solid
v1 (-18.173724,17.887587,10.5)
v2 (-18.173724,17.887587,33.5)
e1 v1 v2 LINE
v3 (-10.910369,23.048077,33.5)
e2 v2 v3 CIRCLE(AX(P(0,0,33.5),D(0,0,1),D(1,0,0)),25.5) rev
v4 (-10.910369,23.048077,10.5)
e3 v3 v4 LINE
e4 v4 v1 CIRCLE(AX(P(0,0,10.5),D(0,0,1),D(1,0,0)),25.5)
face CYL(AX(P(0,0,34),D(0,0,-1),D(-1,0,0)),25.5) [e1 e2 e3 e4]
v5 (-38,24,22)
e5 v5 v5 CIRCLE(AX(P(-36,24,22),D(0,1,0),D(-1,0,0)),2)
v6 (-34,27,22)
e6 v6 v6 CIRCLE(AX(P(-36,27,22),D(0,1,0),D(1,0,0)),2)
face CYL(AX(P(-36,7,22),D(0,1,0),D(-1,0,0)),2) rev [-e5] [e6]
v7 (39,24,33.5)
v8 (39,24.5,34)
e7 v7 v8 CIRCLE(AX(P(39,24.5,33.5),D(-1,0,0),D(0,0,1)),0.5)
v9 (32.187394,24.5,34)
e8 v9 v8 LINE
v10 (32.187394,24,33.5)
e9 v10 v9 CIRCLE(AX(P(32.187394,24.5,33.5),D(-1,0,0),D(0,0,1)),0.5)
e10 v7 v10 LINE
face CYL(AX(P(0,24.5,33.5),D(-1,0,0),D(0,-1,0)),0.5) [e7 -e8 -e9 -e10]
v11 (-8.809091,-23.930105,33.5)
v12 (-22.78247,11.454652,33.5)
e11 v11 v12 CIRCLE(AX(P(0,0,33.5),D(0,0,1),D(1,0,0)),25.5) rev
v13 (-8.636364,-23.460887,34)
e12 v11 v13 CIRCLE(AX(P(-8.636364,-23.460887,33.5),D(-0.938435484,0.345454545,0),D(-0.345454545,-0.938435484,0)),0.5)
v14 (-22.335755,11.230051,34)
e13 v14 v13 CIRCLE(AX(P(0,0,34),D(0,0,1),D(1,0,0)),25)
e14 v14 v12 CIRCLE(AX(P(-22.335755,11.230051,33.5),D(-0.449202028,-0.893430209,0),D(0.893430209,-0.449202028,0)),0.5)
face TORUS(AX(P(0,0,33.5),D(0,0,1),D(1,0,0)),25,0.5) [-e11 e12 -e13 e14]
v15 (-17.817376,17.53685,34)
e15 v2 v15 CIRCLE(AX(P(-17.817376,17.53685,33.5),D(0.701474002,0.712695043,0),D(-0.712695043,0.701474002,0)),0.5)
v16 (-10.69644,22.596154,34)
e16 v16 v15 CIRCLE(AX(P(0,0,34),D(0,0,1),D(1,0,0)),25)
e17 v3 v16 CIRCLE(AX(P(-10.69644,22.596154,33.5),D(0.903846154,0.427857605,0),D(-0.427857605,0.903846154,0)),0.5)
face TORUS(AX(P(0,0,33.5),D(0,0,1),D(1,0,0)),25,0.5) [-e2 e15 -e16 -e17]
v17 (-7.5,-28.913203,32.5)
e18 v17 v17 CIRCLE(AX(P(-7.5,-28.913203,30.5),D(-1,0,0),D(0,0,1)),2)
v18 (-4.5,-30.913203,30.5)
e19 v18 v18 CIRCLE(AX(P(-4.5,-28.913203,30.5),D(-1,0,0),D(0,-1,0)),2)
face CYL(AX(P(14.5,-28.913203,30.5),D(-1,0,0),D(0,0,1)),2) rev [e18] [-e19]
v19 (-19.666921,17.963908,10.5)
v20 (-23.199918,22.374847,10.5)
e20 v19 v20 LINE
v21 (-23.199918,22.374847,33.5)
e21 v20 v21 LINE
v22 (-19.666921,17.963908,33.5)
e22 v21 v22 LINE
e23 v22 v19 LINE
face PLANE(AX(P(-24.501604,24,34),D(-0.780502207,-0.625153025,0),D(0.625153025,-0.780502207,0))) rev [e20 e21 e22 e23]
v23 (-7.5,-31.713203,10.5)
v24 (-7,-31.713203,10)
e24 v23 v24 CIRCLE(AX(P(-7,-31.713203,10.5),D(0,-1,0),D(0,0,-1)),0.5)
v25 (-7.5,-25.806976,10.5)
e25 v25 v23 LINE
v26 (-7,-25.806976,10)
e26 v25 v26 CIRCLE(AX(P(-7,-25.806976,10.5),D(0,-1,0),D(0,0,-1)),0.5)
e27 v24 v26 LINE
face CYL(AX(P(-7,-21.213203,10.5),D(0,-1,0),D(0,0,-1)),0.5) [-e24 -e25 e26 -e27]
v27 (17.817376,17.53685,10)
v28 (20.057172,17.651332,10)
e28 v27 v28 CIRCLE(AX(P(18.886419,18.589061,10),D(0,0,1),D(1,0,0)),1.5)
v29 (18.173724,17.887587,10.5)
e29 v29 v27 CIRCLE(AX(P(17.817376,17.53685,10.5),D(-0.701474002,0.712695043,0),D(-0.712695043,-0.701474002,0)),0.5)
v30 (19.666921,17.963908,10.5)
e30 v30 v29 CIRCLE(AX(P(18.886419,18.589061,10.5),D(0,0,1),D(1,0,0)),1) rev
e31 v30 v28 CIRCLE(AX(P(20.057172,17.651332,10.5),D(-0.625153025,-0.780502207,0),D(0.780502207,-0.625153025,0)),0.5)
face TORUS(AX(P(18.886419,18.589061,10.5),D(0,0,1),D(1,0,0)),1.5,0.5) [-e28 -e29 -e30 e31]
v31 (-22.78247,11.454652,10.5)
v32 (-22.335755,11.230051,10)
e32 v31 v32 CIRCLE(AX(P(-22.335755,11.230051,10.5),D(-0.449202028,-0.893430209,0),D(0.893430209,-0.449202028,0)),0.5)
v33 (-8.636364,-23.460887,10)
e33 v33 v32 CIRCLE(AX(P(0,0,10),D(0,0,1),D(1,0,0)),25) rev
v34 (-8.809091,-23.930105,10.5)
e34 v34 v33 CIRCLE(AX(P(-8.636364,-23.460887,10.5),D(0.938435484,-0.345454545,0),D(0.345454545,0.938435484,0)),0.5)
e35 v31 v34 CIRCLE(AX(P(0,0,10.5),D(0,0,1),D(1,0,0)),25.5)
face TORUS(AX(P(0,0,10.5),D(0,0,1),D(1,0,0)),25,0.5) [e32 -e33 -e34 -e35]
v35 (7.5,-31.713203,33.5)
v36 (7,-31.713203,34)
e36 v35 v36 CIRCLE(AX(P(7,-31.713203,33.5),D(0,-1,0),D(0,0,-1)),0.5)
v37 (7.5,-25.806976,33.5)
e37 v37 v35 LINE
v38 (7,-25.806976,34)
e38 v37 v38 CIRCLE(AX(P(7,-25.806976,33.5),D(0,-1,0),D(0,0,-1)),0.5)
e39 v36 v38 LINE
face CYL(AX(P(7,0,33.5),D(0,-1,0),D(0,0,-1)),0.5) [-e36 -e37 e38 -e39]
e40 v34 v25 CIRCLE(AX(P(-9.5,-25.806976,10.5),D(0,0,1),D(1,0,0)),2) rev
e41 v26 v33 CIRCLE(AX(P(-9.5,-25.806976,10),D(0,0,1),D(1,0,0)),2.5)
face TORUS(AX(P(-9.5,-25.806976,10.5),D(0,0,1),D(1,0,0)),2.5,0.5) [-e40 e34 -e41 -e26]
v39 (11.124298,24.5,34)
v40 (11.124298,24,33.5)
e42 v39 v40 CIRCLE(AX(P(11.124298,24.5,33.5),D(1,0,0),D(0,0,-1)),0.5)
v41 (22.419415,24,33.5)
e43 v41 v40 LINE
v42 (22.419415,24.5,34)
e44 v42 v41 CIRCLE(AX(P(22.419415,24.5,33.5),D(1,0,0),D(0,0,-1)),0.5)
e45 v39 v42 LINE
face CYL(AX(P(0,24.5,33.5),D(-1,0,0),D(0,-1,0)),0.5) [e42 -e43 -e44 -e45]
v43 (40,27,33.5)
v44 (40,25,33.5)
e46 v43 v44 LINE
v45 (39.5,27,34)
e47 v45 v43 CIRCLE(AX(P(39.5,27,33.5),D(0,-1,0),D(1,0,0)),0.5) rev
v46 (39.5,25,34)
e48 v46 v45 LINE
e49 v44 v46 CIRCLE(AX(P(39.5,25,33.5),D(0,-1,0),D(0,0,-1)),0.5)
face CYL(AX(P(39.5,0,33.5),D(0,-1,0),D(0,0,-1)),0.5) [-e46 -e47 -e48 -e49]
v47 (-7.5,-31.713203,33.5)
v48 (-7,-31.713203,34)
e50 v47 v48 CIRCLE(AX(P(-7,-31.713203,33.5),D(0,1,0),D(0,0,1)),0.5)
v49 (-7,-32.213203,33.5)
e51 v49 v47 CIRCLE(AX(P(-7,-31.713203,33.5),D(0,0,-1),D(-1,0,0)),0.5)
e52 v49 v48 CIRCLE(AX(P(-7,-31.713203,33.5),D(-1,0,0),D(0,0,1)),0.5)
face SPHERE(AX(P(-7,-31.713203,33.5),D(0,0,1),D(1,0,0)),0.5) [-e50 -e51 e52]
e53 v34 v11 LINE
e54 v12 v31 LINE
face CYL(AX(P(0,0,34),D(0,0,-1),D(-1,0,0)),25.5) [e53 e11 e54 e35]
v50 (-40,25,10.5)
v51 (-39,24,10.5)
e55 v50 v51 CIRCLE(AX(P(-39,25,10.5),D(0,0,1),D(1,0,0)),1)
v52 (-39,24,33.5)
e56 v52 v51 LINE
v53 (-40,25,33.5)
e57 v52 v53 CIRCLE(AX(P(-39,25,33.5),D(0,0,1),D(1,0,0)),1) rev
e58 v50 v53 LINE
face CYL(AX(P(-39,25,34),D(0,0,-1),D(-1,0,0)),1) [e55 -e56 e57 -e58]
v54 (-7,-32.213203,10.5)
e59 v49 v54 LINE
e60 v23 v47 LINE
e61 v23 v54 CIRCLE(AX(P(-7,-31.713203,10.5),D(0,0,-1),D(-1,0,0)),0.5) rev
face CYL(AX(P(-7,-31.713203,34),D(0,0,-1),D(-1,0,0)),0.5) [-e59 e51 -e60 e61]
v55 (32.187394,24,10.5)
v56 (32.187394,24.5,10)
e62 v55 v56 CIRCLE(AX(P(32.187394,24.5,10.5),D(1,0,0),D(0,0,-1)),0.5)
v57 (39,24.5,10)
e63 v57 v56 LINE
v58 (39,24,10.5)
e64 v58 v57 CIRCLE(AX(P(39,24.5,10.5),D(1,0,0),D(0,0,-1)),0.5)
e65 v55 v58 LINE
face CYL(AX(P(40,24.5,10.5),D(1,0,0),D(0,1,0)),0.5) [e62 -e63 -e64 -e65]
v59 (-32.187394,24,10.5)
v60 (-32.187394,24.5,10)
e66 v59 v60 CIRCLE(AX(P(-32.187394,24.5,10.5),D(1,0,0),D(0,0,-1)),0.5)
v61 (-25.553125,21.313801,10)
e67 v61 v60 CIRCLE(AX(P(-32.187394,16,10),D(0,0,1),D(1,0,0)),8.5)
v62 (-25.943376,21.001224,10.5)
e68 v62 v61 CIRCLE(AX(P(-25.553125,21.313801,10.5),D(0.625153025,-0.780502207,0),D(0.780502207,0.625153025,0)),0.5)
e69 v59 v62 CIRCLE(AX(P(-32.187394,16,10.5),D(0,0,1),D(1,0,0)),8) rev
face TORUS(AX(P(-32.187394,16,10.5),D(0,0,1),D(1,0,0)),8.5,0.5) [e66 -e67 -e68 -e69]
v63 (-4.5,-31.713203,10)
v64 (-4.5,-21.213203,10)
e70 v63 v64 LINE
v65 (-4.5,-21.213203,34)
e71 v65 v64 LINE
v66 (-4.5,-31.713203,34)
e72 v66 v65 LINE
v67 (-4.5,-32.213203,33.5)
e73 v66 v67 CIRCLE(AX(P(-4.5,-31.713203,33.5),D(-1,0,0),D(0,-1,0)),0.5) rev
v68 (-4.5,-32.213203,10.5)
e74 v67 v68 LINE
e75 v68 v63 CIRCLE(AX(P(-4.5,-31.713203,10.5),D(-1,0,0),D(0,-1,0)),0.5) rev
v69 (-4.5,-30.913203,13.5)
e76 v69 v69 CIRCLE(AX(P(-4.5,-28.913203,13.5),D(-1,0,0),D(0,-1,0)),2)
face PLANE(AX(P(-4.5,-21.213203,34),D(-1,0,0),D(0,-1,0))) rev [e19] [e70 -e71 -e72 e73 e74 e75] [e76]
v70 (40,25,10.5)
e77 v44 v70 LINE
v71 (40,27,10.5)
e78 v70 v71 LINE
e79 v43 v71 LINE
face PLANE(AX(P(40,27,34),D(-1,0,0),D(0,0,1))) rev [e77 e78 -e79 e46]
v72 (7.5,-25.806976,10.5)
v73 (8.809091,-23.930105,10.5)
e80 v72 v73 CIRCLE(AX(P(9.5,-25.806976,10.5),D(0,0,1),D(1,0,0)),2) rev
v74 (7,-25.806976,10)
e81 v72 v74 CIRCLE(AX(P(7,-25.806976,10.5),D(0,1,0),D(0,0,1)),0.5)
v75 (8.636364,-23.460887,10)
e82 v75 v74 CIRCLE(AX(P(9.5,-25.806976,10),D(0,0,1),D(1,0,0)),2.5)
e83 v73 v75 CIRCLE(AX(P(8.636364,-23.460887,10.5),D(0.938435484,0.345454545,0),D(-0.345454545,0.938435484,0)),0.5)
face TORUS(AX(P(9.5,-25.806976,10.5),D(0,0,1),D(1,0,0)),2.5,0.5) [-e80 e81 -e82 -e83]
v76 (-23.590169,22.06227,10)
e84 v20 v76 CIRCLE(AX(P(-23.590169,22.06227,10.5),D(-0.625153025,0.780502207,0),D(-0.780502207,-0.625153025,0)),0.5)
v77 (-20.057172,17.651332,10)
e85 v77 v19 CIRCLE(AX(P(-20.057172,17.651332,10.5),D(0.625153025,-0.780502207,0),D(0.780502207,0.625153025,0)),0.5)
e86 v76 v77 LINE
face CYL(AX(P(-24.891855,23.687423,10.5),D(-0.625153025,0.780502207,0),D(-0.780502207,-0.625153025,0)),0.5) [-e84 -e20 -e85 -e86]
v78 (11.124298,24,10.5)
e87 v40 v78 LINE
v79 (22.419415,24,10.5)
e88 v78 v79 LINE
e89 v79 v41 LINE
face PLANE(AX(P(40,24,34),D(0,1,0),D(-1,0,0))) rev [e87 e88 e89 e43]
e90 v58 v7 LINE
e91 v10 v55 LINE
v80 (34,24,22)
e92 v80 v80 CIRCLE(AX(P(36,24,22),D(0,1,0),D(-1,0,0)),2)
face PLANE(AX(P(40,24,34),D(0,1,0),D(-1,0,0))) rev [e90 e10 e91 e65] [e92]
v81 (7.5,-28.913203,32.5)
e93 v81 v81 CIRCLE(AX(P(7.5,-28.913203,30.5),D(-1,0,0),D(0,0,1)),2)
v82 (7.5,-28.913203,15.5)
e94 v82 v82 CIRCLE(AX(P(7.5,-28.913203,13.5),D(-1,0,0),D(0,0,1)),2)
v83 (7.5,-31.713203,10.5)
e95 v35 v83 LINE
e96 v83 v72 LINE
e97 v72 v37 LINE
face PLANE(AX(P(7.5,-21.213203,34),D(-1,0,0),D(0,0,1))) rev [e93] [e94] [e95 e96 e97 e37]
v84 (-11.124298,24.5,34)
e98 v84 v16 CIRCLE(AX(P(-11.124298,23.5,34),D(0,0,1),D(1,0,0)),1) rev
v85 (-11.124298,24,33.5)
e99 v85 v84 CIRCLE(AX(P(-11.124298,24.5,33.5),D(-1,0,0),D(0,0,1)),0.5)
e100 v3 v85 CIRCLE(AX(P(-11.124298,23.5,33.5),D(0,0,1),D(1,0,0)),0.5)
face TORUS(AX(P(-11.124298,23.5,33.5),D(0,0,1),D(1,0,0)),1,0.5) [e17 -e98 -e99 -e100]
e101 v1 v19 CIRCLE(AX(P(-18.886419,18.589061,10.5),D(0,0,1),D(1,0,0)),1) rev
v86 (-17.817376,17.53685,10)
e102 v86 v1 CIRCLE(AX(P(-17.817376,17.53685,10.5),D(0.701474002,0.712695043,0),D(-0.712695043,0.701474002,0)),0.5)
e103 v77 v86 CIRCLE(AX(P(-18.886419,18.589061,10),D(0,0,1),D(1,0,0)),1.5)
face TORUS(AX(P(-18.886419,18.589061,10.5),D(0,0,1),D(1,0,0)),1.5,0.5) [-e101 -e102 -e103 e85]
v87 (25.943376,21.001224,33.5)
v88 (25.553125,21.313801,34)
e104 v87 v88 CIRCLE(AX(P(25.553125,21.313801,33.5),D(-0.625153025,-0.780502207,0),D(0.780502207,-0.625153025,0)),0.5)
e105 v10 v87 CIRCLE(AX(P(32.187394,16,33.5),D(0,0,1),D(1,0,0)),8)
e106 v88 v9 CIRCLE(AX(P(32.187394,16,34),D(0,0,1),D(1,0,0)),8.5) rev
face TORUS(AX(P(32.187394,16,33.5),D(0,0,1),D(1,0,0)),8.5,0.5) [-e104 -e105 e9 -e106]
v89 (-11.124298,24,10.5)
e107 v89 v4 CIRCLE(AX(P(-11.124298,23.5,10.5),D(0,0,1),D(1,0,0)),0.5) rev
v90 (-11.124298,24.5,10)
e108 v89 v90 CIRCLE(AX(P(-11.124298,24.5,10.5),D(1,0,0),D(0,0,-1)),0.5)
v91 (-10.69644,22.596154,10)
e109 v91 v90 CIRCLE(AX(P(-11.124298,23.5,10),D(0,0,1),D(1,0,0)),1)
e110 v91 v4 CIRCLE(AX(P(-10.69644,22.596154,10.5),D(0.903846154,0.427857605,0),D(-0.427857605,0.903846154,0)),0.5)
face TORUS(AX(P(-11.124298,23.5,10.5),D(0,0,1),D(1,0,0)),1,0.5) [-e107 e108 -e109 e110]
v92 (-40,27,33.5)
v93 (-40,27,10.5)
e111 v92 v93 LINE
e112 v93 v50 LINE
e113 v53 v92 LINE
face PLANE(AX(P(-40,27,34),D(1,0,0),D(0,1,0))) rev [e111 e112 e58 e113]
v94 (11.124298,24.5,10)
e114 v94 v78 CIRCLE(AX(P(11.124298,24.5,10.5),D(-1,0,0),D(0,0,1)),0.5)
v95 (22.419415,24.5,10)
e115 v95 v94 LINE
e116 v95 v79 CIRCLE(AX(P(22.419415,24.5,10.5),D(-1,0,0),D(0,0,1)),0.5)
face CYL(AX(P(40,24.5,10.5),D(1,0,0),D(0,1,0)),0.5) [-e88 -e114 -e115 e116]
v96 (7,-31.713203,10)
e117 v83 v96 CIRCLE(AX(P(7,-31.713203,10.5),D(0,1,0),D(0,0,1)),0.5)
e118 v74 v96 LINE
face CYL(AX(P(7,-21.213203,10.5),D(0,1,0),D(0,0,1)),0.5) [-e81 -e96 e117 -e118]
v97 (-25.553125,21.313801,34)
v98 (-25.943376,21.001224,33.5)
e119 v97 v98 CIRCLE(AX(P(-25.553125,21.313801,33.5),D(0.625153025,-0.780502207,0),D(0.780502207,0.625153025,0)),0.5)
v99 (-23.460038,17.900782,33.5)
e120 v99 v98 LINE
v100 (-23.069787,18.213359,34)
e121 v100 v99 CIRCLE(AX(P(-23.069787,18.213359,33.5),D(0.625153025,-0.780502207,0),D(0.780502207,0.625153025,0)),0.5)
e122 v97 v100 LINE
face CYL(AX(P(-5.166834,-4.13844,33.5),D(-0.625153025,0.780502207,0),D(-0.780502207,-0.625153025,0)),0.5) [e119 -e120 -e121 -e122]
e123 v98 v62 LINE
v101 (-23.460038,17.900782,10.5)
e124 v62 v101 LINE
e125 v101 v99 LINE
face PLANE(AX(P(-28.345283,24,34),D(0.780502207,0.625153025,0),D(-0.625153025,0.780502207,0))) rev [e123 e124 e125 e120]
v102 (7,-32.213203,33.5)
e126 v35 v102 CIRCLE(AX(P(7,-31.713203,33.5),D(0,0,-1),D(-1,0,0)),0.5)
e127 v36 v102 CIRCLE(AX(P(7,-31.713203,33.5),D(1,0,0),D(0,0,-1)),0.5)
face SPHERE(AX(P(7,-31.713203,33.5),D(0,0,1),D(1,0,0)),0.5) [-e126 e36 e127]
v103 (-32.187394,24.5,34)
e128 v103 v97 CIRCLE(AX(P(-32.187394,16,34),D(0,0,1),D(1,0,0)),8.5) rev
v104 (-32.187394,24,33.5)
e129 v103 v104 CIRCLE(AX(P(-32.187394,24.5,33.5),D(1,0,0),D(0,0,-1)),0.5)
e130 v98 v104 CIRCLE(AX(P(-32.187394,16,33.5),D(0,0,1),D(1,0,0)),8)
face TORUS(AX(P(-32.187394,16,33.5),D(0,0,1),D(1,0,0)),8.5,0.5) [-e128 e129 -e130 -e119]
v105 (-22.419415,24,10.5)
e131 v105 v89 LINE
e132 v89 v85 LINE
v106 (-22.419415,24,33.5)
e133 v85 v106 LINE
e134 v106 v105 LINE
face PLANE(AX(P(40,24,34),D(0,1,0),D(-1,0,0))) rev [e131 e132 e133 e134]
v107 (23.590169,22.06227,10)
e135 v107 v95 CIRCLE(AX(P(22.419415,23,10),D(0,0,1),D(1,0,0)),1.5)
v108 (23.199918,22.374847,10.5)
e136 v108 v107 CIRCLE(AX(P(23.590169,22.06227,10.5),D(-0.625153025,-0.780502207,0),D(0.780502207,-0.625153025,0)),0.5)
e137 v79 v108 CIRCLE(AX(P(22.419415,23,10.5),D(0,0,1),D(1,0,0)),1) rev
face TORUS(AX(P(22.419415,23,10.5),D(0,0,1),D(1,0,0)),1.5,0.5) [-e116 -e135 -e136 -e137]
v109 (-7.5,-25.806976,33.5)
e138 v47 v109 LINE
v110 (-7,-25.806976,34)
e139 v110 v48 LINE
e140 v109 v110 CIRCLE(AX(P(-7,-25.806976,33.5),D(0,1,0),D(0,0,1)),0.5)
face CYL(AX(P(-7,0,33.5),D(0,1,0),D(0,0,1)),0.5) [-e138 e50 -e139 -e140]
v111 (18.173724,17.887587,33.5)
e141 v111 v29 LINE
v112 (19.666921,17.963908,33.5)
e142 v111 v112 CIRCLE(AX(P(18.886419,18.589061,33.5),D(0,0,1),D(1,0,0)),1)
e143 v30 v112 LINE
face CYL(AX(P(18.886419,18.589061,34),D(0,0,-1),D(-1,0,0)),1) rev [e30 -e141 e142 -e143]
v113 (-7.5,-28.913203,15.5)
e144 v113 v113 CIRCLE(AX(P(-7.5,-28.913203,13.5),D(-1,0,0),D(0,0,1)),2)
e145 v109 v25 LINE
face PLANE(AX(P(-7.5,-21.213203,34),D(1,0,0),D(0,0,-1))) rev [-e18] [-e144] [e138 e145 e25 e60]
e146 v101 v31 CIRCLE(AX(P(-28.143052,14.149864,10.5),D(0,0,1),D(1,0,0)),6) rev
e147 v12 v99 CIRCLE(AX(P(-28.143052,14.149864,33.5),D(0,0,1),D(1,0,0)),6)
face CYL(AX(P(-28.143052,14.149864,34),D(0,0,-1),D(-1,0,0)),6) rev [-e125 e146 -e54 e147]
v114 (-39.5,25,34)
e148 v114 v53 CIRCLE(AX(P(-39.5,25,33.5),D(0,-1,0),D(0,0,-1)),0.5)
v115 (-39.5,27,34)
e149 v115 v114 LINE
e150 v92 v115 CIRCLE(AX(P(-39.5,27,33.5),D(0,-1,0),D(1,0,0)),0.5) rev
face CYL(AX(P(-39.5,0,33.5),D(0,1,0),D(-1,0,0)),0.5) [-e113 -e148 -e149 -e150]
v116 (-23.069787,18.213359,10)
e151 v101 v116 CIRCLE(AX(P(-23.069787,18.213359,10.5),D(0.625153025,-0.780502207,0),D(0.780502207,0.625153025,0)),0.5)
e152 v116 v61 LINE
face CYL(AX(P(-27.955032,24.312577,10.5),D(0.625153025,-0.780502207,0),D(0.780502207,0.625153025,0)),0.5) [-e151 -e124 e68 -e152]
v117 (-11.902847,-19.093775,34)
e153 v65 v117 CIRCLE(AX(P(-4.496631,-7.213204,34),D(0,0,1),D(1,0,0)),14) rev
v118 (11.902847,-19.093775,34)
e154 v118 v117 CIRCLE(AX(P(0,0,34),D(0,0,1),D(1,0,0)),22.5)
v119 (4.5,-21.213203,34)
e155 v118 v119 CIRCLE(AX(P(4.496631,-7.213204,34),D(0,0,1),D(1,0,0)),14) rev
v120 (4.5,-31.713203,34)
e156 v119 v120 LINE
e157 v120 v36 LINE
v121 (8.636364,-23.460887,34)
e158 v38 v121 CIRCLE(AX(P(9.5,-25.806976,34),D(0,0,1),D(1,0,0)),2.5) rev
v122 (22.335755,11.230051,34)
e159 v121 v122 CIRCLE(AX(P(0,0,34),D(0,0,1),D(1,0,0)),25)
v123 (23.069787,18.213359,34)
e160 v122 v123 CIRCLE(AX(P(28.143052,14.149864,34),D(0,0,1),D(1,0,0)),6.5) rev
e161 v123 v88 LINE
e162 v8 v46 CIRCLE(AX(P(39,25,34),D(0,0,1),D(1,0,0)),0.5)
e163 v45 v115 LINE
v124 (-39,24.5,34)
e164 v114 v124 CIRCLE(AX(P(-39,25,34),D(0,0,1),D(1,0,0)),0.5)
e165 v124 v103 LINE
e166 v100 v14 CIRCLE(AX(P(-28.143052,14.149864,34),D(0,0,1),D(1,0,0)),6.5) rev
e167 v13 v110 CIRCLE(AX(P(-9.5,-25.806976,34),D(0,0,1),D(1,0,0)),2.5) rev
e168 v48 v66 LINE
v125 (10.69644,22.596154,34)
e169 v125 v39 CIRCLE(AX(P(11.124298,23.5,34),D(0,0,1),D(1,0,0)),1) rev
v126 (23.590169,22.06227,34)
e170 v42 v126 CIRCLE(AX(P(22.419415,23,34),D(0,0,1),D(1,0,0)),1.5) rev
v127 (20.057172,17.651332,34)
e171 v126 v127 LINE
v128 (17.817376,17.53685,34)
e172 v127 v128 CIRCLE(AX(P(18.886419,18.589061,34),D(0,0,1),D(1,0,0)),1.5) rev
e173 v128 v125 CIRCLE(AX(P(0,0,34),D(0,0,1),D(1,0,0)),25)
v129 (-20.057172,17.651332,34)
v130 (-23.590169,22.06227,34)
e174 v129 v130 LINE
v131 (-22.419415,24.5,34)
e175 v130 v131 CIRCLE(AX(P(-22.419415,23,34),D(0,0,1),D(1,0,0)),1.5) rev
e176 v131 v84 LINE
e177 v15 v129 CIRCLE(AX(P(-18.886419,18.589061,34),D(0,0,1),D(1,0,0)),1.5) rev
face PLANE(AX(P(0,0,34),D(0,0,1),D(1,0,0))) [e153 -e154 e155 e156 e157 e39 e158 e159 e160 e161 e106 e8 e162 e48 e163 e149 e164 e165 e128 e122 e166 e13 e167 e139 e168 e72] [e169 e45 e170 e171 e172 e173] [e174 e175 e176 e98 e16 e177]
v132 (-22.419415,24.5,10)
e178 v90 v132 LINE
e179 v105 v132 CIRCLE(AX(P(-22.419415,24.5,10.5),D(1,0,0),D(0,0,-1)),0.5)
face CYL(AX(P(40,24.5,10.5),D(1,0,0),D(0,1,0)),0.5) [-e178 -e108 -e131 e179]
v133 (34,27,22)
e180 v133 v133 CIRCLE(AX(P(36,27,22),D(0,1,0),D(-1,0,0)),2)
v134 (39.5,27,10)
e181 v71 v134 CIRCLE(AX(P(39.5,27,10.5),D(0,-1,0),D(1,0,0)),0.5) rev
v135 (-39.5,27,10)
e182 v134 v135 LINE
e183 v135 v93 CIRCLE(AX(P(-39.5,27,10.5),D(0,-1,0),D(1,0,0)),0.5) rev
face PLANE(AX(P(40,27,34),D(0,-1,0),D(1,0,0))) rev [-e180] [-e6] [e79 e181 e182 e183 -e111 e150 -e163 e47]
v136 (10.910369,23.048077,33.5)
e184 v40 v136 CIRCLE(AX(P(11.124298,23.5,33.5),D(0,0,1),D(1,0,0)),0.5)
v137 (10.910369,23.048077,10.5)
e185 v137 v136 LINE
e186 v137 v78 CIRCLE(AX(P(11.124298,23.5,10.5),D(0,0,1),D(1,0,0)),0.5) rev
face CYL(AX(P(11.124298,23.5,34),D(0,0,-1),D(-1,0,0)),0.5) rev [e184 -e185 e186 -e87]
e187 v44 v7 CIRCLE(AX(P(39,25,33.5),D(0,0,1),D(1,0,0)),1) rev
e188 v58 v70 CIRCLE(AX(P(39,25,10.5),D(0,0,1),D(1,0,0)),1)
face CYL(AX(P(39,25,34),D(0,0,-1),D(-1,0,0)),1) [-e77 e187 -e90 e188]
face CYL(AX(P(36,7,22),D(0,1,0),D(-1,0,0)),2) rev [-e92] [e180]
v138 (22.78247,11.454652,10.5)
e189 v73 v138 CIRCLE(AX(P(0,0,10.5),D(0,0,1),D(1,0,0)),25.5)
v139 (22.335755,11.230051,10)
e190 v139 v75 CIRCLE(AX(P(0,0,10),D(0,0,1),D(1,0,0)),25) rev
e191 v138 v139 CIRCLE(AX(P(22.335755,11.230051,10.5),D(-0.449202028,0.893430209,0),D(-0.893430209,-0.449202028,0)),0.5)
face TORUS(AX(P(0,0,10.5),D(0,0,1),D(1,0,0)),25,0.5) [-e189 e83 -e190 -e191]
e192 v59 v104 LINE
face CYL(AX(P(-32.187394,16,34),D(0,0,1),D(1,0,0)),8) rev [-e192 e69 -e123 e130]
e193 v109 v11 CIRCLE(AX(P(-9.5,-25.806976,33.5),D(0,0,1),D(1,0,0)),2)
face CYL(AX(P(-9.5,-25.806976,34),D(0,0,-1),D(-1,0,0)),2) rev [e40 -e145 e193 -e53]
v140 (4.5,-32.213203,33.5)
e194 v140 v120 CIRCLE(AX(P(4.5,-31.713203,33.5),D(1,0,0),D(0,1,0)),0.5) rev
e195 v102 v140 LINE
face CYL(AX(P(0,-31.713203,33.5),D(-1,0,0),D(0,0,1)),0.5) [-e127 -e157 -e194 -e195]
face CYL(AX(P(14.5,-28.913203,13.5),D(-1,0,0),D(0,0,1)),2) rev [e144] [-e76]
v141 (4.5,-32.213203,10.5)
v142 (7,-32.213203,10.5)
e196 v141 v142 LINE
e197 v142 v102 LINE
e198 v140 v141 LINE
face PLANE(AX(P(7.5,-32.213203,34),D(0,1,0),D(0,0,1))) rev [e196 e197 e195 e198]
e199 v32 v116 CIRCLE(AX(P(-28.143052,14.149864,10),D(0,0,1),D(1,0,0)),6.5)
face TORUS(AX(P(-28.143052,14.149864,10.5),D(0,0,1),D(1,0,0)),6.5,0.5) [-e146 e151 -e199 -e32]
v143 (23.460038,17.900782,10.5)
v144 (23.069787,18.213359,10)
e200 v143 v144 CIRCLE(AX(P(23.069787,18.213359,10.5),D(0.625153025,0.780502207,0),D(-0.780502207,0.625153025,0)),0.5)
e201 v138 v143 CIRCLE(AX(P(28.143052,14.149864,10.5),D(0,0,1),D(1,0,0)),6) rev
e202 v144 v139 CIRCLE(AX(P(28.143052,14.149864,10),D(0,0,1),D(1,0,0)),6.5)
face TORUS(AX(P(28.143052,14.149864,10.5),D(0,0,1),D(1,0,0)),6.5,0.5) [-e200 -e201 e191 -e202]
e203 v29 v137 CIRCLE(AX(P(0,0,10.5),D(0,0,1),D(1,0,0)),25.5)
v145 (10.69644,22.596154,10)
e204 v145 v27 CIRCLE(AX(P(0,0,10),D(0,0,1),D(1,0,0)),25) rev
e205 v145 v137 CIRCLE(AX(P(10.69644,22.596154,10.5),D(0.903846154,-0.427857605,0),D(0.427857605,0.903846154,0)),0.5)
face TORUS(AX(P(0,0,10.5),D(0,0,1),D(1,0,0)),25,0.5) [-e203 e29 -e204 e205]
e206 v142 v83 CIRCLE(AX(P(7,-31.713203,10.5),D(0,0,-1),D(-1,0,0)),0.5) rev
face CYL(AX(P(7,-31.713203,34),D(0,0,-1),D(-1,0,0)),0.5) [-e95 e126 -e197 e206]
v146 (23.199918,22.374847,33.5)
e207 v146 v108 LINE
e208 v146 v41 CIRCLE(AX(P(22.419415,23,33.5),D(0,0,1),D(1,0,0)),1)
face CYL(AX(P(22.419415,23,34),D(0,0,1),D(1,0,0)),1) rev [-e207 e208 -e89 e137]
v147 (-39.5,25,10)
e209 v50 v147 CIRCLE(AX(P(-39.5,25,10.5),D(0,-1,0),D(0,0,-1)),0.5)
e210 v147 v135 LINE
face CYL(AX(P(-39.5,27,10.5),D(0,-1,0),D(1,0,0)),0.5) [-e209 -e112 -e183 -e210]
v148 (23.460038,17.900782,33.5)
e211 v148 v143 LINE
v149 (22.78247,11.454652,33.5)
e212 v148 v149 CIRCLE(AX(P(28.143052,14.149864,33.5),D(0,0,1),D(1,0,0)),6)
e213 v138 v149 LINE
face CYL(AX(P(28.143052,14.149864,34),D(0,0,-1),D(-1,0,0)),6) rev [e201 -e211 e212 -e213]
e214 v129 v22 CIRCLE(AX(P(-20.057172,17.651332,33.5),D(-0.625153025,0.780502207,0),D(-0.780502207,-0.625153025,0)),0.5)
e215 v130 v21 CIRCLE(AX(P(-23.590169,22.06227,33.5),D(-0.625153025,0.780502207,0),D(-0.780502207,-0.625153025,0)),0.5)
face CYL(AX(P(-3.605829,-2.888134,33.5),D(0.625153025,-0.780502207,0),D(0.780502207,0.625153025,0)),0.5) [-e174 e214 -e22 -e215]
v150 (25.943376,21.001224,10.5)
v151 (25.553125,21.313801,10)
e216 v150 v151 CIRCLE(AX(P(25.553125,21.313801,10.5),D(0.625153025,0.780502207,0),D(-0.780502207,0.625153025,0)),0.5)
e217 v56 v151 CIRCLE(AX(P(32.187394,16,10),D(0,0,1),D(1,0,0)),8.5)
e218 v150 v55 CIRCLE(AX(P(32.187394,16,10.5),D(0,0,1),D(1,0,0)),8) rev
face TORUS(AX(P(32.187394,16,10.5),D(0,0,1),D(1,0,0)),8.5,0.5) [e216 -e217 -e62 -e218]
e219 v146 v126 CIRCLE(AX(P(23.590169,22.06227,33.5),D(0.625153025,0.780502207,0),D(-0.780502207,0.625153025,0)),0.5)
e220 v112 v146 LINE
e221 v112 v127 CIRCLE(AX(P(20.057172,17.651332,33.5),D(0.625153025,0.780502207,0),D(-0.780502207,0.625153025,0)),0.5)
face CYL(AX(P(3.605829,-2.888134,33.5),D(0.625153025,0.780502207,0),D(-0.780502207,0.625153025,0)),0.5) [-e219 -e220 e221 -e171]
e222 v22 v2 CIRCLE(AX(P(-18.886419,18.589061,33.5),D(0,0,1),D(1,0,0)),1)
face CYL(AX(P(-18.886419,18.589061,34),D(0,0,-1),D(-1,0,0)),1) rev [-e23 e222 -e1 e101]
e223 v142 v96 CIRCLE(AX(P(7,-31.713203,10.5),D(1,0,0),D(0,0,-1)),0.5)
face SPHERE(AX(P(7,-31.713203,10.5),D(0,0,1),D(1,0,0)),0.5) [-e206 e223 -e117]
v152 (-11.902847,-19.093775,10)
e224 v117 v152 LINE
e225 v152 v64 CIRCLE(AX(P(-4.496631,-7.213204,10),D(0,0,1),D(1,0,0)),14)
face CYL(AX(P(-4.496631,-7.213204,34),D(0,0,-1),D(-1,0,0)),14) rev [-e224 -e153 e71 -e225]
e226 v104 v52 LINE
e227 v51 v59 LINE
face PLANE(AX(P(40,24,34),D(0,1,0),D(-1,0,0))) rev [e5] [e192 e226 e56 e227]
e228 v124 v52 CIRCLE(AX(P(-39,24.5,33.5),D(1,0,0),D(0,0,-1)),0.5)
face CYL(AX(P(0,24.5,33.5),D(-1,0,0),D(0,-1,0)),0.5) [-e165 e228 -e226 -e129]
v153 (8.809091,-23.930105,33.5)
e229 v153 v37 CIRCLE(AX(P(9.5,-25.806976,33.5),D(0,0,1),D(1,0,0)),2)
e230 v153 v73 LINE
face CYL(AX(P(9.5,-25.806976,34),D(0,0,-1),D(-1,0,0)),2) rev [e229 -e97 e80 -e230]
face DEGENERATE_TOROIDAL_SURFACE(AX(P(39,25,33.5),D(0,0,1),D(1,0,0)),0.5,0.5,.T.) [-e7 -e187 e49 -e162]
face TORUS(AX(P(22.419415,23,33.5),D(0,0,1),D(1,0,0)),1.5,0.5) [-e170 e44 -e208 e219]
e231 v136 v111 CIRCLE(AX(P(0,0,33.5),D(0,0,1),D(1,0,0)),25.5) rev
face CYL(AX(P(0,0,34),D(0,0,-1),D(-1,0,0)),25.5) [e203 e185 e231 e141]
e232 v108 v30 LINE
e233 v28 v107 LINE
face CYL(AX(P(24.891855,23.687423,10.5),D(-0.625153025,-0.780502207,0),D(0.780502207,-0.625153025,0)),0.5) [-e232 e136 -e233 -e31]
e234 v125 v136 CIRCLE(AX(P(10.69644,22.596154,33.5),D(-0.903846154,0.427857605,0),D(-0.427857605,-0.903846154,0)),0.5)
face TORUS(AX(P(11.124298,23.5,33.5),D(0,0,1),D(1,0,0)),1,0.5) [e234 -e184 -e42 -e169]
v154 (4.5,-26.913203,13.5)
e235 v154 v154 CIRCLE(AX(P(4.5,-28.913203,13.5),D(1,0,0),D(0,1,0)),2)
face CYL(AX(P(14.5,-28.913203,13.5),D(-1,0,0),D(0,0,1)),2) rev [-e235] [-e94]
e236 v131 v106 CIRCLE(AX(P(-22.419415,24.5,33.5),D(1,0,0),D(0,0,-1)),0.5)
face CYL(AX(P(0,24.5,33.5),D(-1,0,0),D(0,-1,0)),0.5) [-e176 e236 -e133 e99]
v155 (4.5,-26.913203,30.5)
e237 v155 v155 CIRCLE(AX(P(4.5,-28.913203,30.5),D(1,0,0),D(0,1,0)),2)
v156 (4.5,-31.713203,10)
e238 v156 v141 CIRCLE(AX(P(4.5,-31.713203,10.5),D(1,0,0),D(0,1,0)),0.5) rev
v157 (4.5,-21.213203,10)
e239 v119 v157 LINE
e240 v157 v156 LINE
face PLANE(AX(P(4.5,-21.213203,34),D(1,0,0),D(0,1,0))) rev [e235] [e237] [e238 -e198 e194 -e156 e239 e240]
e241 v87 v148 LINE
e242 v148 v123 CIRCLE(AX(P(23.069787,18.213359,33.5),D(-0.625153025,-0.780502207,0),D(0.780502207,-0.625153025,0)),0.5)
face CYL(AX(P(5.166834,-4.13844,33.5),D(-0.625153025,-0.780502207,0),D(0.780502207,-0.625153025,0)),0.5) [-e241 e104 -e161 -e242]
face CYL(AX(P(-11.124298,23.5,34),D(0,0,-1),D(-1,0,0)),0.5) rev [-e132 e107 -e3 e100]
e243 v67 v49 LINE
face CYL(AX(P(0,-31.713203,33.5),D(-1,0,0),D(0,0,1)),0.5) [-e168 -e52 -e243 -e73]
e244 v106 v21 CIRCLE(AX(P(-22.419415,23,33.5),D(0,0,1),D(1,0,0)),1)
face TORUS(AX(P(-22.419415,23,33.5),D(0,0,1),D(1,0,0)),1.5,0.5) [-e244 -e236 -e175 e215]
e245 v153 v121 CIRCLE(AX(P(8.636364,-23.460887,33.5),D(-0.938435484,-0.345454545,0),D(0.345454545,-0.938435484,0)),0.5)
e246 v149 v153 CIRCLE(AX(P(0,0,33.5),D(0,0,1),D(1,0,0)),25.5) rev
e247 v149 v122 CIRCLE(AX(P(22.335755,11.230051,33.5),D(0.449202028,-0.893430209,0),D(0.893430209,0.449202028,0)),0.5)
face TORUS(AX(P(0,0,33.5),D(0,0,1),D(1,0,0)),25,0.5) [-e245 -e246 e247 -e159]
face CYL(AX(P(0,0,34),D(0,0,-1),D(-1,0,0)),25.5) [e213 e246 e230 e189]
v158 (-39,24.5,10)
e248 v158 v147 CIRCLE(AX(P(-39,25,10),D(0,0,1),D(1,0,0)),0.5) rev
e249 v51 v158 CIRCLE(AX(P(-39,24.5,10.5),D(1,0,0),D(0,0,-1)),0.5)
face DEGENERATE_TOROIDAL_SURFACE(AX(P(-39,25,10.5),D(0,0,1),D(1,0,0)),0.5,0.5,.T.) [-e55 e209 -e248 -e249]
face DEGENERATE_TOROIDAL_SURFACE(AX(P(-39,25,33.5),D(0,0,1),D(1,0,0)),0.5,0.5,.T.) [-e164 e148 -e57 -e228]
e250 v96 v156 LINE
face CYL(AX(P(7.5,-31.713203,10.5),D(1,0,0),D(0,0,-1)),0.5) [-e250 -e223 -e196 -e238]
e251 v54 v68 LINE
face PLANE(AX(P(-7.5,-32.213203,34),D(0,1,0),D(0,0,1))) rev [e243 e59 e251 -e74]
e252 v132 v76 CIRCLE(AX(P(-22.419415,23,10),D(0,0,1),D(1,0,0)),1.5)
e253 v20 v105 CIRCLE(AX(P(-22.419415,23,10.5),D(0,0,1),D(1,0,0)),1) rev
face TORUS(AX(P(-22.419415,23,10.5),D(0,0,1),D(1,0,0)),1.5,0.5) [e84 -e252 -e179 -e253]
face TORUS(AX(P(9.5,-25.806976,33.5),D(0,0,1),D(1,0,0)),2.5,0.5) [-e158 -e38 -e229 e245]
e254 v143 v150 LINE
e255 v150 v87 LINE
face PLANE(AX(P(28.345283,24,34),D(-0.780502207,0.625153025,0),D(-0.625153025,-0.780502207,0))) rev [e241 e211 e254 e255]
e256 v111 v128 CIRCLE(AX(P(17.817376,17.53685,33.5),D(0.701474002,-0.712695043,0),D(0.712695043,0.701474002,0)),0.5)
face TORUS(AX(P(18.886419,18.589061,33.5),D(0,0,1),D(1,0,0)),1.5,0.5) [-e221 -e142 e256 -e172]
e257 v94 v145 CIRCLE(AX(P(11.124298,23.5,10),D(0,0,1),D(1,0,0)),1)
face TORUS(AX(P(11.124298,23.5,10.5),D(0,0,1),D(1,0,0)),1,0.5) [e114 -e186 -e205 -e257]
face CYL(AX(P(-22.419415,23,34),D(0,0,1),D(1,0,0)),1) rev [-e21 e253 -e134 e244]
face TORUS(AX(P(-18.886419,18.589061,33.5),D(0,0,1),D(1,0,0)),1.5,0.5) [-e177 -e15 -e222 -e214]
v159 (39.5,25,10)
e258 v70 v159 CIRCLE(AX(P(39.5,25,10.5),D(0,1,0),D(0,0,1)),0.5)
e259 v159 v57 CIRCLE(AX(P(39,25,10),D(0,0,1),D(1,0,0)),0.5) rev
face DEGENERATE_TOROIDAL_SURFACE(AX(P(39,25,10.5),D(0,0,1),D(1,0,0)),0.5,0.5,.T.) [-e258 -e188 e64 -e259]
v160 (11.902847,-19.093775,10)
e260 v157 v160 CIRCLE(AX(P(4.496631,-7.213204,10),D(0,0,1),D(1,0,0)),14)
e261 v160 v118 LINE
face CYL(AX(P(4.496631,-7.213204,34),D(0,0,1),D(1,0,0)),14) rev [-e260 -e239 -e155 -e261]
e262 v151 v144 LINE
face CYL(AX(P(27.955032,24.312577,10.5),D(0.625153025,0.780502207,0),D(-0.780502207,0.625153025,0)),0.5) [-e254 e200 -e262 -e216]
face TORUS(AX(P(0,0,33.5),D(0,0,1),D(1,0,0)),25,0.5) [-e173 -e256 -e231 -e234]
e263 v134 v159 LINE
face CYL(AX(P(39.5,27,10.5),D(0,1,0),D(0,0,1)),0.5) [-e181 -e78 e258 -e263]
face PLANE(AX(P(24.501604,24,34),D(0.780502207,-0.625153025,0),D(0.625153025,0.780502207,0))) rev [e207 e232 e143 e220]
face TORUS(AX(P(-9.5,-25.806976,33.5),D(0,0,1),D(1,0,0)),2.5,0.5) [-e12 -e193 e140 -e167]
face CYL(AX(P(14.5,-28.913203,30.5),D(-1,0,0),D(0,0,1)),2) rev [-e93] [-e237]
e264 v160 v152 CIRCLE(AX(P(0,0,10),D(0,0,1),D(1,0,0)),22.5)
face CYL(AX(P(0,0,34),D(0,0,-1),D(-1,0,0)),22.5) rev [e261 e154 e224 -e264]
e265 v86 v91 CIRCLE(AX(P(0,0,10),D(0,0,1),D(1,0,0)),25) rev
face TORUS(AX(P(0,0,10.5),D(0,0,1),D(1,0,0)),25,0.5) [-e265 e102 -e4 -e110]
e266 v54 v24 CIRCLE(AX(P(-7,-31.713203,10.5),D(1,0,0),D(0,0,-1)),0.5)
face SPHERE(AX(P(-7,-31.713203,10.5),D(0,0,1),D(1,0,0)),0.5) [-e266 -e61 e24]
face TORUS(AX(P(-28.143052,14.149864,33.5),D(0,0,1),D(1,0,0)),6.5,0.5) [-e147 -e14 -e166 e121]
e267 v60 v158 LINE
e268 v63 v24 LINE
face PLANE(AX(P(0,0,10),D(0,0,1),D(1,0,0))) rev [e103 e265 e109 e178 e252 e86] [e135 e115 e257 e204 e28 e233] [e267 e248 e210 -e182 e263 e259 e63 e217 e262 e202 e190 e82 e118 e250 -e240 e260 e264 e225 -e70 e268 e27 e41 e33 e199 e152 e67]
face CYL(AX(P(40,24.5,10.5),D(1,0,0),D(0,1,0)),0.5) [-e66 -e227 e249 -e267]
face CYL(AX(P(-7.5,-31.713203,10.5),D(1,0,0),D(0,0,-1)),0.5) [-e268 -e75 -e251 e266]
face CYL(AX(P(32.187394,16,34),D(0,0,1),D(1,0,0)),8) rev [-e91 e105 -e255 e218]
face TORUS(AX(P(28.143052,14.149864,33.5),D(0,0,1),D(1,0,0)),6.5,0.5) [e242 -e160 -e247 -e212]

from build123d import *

# Parameters (mm, degrees)
SKIZZE1_R                       = 25.5
SKIZZE1_R_2                     = 22.5
AUFSATZ_LINEAR_AUSTRAGEN1_DEPTH = 24
SKIZZE2_W                       = 15
SKIZZE2_H                       = 10
SCHNITT_LINEAR_AUSTRAGEN3_DEPTH = 25
SKIZZE5_W                       = 80
SKIZZE5_H                       = 3
AUFSATZ_LINEAR_AUSTRAGEN2_DEPTH = 24
SKIZZE6_W                       = 3
SKIZZE6_H                       = 11
AUFSATZ_LINEAR_AUSTRAGEN3_DEPTH = 24
AUFSATZ_LINEAR_AUSTRAGEN4_DEPTH = 24
VERRUNDUNG3_R                   = 6
VERRUNDUNG4_R                   = 1
VERRUNDUNG5_R                   = 1
VERRUNDUNG6_R                   = 0.5
VERRUNDUNG11_R                  = 14
VERRUNDUNG12_R                  = 2
VERRUNDUNG13_R                  = 1
SKIZZE11_R                      = 2
SCHNITT_LINEAR_AUSTRAGEN4_DEPTH = 20
SKIZZE12_R                      = 2
SCHNITT_LINEAR_AUSTRAGEN5_DEPTH = 22
VERRUNDUNG14_R                  = 0.5
VERRUNDUNG15_R                  = 8
VERRUNDUNG16_R                  = 0.5
VERRUNDUNG17_R                  = 0.5


with BuildPart() as part:
    # Skizze1 → Aufsatz-Linear austragen1 (new body)
    with BuildSketch(Plane.XY.offset(10)):
        Circle(SKIZZE1_R)
        Circle(SKIZZE1_R_2, mode=Mode.SUBTRACT)
    extrude(amount=AUFSATZ_LINEAR_AUSTRAGEN1_DEPTH)

    # Skizze2 → Schnitt-Linear austragen3 (cut)
    with BuildSketch(Plane.XY.offset(10)):
        with Locations((0, -23.935185079)):
            Rectangle(SKIZZE2_W, SKIZZE2_H)
    extrude(amount=SCHNITT_LINEAR_AUSTRAGEN3_DEPTH, mode=Mode.SUBTRACT)

    # Skizze5 → Aufsatz-Linear austragen2 (add)
    with BuildSketch(Plane.XY.offset(10)):
        with Locations((0, 25.5)):
            Rectangle(SKIZZE5_W, SKIZZE5_H)
    extrude(amount=AUFSATZ_LINEAR_AUSTRAGEN2_DEPTH)

    # Skizze6 → Aufsatz-Linear austragen3 (add)
    with BuildSketch(Plane.XY.offset(10)):
        with Locations((6, -26.713203436)):
            Rectangle(SKIZZE6_W, SKIZZE6_H)
        with Locations((-6, -26.713203436)):
            Rectangle(SKIZZE6_W, SKIZZE6_H)
    extrude(amount=AUFSATZ_LINEAR_AUSTRAGEN3_DEPTH)

    # Skizze10 → Aufsatz-Linear austragen4 (add)
    with BuildSketch(Plane.XY.offset(10)):
        with BuildLine():
            Line((28.345283417, 24), (20.864493302, 14.660249631))
            ThreePointArc((20.864493302, 14.660249631), (18.945102255, 15.097259463), (18.947545893, 17.065769969))
            Line((18.947545893, 17.065769969), (24.501604344, 24))
            Line((24.501604344, 24), (28.345283417, 24))
        make_face()
        with BuildLine():
            Line((-24.501604344, 24), (-18.947545893, 17.065769969))
            ThreePointArc((-18.947545893, 17.065769969), (-18.945102255, 15.097259463), (-20.864493302, 14.660249631))
            Line((-20.864493302, 14.660249631), (-28.345283417, 24))
            Line((-28.345283417, 24), (-24.501604344, 24))
        make_face()
    extrude(amount=AUFSATZ_LINEAR_AUSTRAGEN4_DEPTH)

    # Verrundung3
    verrundung3_edges = [part.edges().sort_by_distance(p)[0] for p in [
        (-20.864493302, 14.660249631, 22),
        (20.864493302, 14.660249631, 22),
    ]]
    fillet(verrundung3_edges, radius=VERRUNDUNG3_R)

    # Verrundung4
    verrundung4_edges = [part.edges().sort_by_distance(p)[0] for p in [
        (-18.947545893, 17.065769969, 22),
        (18.947545893, 17.065769969, 22),
    ]]
    fillet(verrundung4_edges, radius=VERRUNDUNG4_R)

    # Verrundung5
    verrundung5_edges = [part.edges().sort_by_distance(p)[0] for p in [
        (-24.501604344, 24, 22),
        (24.501604344, 24, 22),
    ]]
    fillet(verrundung5_edges, radius=VERRUNDUNG5_R)

    # Verrundung6
    verrundung6_edges = [part.edges().sort_by_distance(p)[0] for p in [
        (-8.61684397, 24, 22),
        (8.61684397, 24, 22),
    ]]
    fillet(verrundung6_edges, radius=VERRUNDUNG6_R)

    # Verrundung11
    # the kernel refuses this fillet: 14 mm, written as the material it adds along each edge
    with BuildSketch(Plane(origin=(-7.5, -21.213203436, 34), x_dir=(-0.9010385119432196, 0.43373909207627176, 0), z_dir=(0, 0, -1))) as verrundung11_piece_1:
        with BuildLine():
            CenterArc((3.366195979, 13.917217345), VERRUNDUNG11_R, 244.308700365, 31.925166456)
            Line((-2.703115536, 1.301217276), (-2.824501766, 1.048897275))
            Line((-2.824501766, 1.048897275), (-0.121446946, -0.252290783))
            Line((-0.121446946, -0.252290783), (-0.030404351, -0.278344347))
            ThreePointArc((-0.030404351, -0.278344347), (2.443206759, -0.413043552), (4.916817868, -0.278344347))
            Line((4.916817868, -0.278344347), (4.886413517, 0))
        make_face()
    extrude(amount=24)
    with BuildSketch(Plane(origin=(7.5, -21.213203436, 34), x_dir=(-1, 0, 0), z_dir=(0, 0, -1))) as verrundung11_piece_2:
        with BuildLine():
            CenterArc((3.003369, 13.999999595), VERRUNDUNG11_R, 238.061045723, 31.925166456)
            Line((-4.402846764, 2.119428562), (-4.55097108, 1.881817142))
            ThreePointArc((-4.55097108, 1.881817142), (-2.380576517, 0.687546134), (-0.093333333, -0.263986532))
            Line((-0.093333333, -0.263986532), (0, -0.28))
            Line((0, -0.28), (2.99993262, -0.279999992))
            Line((2.99993262, -0.279999992), (3, 0))
        make_face()
    extrude(amount=24)

    # Verrundung12
    verrundung12_edges = [part.edges().sort_by_distance(p)[0] for p in [
        (-7.5, -24.372115214, 22),
        (7.5, -24.372115214, 22),
    ]]
    fillet(verrundung12_edges, radius=VERRUNDUNG12_R)

    # Verrundung13
    verrundung13_edges = [part.edges().sort_by_distance(p)[0] for p in [
        (-40, 24, 22),
        (40, 24, 22),
    ]]
    fillet(verrundung13_edges, radius=VERRUNDUNG13_R)

    # Skizze11 → Schnitt-Linear austragen4 (cut)
    with BuildSketch(Plane(origin=(0, 27, 0), x_dir=(1, 0, 0), z_dir=(0, 1, 0))):
        with Locations(Location((36, -22, 0), (0, 0, 180))):
            Circle(SKIZZE11_R)
        with Locations(Location((-36, -22, 0), (0, 0, 180))):
            Circle(SKIZZE11_R)
    extrude(amount=-SCHNITT_LINEAR_AUSTRAGEN4_DEPTH, mode=Mode.SUBTRACT)

    # Skizze12 → Schnitt-Linear austragen5 (cut)
    with BuildSketch(Plane.ZY.offset(7.5)):
        with Locations((13.5, -28.913203436)):
            Circle(SKIZZE12_R)
        with Locations((30.5, -28.913203436)):
            Circle(SKIZZE12_R)
    extrude(amount=-SCHNITT_LINEAR_AUSTRAGEN5_DEPTH, mode=Mode.SUBTRACT)

    # Verrundung14
    verrundung14_edges = [part.edges().sort_by_distance(p)[0] for p in [
        (7.5, -32.213203436, 22),
        (-7.5, -32.213203436, 22),
    ]]
    fillet(verrundung14_edges, radius=VERRUNDUNG14_R)

    # Verrundung15
    verrundung15_edges = [part.edges().sort_by_distance(p)[0] for p in [
        (-28.345283417, 24, 22),
        (28.345283417, 24, 22),
    ]]
    fillet(verrundung15_edges, radius=VERRUNDUNG15_R)

    # Verrundung16
    verrundung16_edges = [part.edges().sort_by_distance(p)[0] for p in [
        (-23.717650268, -9.366059244, 10),
        (-23.717650268, -9.366059244, 34),
        (24.701707347, 19.451003113, 10),
        (24.701707347, 19.451003113, 34),
        (-22.175925253, 14.777082644, 10),
        (-22.175925253, 14.777082644, 34),
        (22.175925253, 14.777082644, 10),
        (22.175925253, 14.777082644, 34),
        (-7.5, -28.760089618, 34),
        (-7.5, -28.760089618, 10),
        (23.717650268, -9.366059244, 10),
        (23.717650268, -9.366059244, 34),
        (-7.859600935, -24.662820694, 10),
        (-7.859600935, -24.662820694, 34),
        (7.859600935, -24.662820694, 34),
        (7.859600935, -24.662820694, 10),
        (-35.593697006, 24, 34),
        (-35.593697006, 24, 10),
        (40, 26, 10),
        (39.707106781, 24.292893219, 10),
        (-39.707106781, 24.292893219, 10),
        (40, 26, 34),
        (39.707106781, 24.292893219, 34),
        (-39.707106781, 24.292893219, 34),
        (-5.75, -32.213203436, 10),
        (-5.75, -32.213203436, 34),
        (7.5, -28.760089618, 10),
        (7.353553391, -32.066756826, 10),
        (-7.353553391, -32.066756826, 10),
        (7.5, -28.760089618, 34),
        (7.353553391, -32.066756826, 34),
        (-7.353553391, -32.066756826, 34),
        (35.593697006, 24, 10),
        (35.593697006, 24, 34),
        (-24.701707347, 19.451003113, 10),
        (-24.701707347, 19.451003113, 34),
        (28.723999262, 23.211442075, 10),
        (28.723999262, 23.211442075, 34),
        (-28.723999262, 23.211442075, 10),
        (-28.723999262, 23.211442075, 34),
        (-40, 26, 10),
        (-40, 26, 34),
        (5.75, -32.213203436, 10),
        (5.75, -32.213203436, 34),
    ]]
    fillet(verrundung16_edges, radius=VERRUNDUNG16_R)

    # Verrundung17
    verrundung17_edges = [part.edges().sort_by_distance(p)[0] for p in [
        (14.76918323, 20.787525748, 10),
        (14.76918323, 20.787525748, 34),
        (-21.433419249, 20.169377508, 10),
        (-21.433419249, 20.169377508, 34),
        (18.937464451, 17.590364754, 10),
        (18.937464451, 17.590364754, 34),
        (-18.937464451, 17.590364754, 10),
        (-18.937464451, 17.590364754, 34),
        (-16.771856592, 24, 10),
        (-16.771856592, 24, 34),
        (21.433419249, 20.169377508, 10),
        (21.433419249, 20.169377508, 34),
        (-23.320845712, 23.432924344, 10),
        (-23.320845712, 23.432924344, 34),
        (23.320845712, 23.432924344, 10),
        (23.320845712, 23.432924344, 34),
        (-14.76918323, 20.787525748, 10),
        (-14.76918323, 20.787525748, 34),
        (16.771856592, 24, 10),
        (16.771856592, 24, 34),
        (-10.636465004, 23.609632252, 34),
        (-10.636465004, 23.609632252, 10),
        (10.636465004, 23.609632252, 10),
        (10.636465004, 23.609632252, 34),
    ]]
    fillet(verrundung17_edges, radius=VERRUNDUNG17_R)


solid = part.part
